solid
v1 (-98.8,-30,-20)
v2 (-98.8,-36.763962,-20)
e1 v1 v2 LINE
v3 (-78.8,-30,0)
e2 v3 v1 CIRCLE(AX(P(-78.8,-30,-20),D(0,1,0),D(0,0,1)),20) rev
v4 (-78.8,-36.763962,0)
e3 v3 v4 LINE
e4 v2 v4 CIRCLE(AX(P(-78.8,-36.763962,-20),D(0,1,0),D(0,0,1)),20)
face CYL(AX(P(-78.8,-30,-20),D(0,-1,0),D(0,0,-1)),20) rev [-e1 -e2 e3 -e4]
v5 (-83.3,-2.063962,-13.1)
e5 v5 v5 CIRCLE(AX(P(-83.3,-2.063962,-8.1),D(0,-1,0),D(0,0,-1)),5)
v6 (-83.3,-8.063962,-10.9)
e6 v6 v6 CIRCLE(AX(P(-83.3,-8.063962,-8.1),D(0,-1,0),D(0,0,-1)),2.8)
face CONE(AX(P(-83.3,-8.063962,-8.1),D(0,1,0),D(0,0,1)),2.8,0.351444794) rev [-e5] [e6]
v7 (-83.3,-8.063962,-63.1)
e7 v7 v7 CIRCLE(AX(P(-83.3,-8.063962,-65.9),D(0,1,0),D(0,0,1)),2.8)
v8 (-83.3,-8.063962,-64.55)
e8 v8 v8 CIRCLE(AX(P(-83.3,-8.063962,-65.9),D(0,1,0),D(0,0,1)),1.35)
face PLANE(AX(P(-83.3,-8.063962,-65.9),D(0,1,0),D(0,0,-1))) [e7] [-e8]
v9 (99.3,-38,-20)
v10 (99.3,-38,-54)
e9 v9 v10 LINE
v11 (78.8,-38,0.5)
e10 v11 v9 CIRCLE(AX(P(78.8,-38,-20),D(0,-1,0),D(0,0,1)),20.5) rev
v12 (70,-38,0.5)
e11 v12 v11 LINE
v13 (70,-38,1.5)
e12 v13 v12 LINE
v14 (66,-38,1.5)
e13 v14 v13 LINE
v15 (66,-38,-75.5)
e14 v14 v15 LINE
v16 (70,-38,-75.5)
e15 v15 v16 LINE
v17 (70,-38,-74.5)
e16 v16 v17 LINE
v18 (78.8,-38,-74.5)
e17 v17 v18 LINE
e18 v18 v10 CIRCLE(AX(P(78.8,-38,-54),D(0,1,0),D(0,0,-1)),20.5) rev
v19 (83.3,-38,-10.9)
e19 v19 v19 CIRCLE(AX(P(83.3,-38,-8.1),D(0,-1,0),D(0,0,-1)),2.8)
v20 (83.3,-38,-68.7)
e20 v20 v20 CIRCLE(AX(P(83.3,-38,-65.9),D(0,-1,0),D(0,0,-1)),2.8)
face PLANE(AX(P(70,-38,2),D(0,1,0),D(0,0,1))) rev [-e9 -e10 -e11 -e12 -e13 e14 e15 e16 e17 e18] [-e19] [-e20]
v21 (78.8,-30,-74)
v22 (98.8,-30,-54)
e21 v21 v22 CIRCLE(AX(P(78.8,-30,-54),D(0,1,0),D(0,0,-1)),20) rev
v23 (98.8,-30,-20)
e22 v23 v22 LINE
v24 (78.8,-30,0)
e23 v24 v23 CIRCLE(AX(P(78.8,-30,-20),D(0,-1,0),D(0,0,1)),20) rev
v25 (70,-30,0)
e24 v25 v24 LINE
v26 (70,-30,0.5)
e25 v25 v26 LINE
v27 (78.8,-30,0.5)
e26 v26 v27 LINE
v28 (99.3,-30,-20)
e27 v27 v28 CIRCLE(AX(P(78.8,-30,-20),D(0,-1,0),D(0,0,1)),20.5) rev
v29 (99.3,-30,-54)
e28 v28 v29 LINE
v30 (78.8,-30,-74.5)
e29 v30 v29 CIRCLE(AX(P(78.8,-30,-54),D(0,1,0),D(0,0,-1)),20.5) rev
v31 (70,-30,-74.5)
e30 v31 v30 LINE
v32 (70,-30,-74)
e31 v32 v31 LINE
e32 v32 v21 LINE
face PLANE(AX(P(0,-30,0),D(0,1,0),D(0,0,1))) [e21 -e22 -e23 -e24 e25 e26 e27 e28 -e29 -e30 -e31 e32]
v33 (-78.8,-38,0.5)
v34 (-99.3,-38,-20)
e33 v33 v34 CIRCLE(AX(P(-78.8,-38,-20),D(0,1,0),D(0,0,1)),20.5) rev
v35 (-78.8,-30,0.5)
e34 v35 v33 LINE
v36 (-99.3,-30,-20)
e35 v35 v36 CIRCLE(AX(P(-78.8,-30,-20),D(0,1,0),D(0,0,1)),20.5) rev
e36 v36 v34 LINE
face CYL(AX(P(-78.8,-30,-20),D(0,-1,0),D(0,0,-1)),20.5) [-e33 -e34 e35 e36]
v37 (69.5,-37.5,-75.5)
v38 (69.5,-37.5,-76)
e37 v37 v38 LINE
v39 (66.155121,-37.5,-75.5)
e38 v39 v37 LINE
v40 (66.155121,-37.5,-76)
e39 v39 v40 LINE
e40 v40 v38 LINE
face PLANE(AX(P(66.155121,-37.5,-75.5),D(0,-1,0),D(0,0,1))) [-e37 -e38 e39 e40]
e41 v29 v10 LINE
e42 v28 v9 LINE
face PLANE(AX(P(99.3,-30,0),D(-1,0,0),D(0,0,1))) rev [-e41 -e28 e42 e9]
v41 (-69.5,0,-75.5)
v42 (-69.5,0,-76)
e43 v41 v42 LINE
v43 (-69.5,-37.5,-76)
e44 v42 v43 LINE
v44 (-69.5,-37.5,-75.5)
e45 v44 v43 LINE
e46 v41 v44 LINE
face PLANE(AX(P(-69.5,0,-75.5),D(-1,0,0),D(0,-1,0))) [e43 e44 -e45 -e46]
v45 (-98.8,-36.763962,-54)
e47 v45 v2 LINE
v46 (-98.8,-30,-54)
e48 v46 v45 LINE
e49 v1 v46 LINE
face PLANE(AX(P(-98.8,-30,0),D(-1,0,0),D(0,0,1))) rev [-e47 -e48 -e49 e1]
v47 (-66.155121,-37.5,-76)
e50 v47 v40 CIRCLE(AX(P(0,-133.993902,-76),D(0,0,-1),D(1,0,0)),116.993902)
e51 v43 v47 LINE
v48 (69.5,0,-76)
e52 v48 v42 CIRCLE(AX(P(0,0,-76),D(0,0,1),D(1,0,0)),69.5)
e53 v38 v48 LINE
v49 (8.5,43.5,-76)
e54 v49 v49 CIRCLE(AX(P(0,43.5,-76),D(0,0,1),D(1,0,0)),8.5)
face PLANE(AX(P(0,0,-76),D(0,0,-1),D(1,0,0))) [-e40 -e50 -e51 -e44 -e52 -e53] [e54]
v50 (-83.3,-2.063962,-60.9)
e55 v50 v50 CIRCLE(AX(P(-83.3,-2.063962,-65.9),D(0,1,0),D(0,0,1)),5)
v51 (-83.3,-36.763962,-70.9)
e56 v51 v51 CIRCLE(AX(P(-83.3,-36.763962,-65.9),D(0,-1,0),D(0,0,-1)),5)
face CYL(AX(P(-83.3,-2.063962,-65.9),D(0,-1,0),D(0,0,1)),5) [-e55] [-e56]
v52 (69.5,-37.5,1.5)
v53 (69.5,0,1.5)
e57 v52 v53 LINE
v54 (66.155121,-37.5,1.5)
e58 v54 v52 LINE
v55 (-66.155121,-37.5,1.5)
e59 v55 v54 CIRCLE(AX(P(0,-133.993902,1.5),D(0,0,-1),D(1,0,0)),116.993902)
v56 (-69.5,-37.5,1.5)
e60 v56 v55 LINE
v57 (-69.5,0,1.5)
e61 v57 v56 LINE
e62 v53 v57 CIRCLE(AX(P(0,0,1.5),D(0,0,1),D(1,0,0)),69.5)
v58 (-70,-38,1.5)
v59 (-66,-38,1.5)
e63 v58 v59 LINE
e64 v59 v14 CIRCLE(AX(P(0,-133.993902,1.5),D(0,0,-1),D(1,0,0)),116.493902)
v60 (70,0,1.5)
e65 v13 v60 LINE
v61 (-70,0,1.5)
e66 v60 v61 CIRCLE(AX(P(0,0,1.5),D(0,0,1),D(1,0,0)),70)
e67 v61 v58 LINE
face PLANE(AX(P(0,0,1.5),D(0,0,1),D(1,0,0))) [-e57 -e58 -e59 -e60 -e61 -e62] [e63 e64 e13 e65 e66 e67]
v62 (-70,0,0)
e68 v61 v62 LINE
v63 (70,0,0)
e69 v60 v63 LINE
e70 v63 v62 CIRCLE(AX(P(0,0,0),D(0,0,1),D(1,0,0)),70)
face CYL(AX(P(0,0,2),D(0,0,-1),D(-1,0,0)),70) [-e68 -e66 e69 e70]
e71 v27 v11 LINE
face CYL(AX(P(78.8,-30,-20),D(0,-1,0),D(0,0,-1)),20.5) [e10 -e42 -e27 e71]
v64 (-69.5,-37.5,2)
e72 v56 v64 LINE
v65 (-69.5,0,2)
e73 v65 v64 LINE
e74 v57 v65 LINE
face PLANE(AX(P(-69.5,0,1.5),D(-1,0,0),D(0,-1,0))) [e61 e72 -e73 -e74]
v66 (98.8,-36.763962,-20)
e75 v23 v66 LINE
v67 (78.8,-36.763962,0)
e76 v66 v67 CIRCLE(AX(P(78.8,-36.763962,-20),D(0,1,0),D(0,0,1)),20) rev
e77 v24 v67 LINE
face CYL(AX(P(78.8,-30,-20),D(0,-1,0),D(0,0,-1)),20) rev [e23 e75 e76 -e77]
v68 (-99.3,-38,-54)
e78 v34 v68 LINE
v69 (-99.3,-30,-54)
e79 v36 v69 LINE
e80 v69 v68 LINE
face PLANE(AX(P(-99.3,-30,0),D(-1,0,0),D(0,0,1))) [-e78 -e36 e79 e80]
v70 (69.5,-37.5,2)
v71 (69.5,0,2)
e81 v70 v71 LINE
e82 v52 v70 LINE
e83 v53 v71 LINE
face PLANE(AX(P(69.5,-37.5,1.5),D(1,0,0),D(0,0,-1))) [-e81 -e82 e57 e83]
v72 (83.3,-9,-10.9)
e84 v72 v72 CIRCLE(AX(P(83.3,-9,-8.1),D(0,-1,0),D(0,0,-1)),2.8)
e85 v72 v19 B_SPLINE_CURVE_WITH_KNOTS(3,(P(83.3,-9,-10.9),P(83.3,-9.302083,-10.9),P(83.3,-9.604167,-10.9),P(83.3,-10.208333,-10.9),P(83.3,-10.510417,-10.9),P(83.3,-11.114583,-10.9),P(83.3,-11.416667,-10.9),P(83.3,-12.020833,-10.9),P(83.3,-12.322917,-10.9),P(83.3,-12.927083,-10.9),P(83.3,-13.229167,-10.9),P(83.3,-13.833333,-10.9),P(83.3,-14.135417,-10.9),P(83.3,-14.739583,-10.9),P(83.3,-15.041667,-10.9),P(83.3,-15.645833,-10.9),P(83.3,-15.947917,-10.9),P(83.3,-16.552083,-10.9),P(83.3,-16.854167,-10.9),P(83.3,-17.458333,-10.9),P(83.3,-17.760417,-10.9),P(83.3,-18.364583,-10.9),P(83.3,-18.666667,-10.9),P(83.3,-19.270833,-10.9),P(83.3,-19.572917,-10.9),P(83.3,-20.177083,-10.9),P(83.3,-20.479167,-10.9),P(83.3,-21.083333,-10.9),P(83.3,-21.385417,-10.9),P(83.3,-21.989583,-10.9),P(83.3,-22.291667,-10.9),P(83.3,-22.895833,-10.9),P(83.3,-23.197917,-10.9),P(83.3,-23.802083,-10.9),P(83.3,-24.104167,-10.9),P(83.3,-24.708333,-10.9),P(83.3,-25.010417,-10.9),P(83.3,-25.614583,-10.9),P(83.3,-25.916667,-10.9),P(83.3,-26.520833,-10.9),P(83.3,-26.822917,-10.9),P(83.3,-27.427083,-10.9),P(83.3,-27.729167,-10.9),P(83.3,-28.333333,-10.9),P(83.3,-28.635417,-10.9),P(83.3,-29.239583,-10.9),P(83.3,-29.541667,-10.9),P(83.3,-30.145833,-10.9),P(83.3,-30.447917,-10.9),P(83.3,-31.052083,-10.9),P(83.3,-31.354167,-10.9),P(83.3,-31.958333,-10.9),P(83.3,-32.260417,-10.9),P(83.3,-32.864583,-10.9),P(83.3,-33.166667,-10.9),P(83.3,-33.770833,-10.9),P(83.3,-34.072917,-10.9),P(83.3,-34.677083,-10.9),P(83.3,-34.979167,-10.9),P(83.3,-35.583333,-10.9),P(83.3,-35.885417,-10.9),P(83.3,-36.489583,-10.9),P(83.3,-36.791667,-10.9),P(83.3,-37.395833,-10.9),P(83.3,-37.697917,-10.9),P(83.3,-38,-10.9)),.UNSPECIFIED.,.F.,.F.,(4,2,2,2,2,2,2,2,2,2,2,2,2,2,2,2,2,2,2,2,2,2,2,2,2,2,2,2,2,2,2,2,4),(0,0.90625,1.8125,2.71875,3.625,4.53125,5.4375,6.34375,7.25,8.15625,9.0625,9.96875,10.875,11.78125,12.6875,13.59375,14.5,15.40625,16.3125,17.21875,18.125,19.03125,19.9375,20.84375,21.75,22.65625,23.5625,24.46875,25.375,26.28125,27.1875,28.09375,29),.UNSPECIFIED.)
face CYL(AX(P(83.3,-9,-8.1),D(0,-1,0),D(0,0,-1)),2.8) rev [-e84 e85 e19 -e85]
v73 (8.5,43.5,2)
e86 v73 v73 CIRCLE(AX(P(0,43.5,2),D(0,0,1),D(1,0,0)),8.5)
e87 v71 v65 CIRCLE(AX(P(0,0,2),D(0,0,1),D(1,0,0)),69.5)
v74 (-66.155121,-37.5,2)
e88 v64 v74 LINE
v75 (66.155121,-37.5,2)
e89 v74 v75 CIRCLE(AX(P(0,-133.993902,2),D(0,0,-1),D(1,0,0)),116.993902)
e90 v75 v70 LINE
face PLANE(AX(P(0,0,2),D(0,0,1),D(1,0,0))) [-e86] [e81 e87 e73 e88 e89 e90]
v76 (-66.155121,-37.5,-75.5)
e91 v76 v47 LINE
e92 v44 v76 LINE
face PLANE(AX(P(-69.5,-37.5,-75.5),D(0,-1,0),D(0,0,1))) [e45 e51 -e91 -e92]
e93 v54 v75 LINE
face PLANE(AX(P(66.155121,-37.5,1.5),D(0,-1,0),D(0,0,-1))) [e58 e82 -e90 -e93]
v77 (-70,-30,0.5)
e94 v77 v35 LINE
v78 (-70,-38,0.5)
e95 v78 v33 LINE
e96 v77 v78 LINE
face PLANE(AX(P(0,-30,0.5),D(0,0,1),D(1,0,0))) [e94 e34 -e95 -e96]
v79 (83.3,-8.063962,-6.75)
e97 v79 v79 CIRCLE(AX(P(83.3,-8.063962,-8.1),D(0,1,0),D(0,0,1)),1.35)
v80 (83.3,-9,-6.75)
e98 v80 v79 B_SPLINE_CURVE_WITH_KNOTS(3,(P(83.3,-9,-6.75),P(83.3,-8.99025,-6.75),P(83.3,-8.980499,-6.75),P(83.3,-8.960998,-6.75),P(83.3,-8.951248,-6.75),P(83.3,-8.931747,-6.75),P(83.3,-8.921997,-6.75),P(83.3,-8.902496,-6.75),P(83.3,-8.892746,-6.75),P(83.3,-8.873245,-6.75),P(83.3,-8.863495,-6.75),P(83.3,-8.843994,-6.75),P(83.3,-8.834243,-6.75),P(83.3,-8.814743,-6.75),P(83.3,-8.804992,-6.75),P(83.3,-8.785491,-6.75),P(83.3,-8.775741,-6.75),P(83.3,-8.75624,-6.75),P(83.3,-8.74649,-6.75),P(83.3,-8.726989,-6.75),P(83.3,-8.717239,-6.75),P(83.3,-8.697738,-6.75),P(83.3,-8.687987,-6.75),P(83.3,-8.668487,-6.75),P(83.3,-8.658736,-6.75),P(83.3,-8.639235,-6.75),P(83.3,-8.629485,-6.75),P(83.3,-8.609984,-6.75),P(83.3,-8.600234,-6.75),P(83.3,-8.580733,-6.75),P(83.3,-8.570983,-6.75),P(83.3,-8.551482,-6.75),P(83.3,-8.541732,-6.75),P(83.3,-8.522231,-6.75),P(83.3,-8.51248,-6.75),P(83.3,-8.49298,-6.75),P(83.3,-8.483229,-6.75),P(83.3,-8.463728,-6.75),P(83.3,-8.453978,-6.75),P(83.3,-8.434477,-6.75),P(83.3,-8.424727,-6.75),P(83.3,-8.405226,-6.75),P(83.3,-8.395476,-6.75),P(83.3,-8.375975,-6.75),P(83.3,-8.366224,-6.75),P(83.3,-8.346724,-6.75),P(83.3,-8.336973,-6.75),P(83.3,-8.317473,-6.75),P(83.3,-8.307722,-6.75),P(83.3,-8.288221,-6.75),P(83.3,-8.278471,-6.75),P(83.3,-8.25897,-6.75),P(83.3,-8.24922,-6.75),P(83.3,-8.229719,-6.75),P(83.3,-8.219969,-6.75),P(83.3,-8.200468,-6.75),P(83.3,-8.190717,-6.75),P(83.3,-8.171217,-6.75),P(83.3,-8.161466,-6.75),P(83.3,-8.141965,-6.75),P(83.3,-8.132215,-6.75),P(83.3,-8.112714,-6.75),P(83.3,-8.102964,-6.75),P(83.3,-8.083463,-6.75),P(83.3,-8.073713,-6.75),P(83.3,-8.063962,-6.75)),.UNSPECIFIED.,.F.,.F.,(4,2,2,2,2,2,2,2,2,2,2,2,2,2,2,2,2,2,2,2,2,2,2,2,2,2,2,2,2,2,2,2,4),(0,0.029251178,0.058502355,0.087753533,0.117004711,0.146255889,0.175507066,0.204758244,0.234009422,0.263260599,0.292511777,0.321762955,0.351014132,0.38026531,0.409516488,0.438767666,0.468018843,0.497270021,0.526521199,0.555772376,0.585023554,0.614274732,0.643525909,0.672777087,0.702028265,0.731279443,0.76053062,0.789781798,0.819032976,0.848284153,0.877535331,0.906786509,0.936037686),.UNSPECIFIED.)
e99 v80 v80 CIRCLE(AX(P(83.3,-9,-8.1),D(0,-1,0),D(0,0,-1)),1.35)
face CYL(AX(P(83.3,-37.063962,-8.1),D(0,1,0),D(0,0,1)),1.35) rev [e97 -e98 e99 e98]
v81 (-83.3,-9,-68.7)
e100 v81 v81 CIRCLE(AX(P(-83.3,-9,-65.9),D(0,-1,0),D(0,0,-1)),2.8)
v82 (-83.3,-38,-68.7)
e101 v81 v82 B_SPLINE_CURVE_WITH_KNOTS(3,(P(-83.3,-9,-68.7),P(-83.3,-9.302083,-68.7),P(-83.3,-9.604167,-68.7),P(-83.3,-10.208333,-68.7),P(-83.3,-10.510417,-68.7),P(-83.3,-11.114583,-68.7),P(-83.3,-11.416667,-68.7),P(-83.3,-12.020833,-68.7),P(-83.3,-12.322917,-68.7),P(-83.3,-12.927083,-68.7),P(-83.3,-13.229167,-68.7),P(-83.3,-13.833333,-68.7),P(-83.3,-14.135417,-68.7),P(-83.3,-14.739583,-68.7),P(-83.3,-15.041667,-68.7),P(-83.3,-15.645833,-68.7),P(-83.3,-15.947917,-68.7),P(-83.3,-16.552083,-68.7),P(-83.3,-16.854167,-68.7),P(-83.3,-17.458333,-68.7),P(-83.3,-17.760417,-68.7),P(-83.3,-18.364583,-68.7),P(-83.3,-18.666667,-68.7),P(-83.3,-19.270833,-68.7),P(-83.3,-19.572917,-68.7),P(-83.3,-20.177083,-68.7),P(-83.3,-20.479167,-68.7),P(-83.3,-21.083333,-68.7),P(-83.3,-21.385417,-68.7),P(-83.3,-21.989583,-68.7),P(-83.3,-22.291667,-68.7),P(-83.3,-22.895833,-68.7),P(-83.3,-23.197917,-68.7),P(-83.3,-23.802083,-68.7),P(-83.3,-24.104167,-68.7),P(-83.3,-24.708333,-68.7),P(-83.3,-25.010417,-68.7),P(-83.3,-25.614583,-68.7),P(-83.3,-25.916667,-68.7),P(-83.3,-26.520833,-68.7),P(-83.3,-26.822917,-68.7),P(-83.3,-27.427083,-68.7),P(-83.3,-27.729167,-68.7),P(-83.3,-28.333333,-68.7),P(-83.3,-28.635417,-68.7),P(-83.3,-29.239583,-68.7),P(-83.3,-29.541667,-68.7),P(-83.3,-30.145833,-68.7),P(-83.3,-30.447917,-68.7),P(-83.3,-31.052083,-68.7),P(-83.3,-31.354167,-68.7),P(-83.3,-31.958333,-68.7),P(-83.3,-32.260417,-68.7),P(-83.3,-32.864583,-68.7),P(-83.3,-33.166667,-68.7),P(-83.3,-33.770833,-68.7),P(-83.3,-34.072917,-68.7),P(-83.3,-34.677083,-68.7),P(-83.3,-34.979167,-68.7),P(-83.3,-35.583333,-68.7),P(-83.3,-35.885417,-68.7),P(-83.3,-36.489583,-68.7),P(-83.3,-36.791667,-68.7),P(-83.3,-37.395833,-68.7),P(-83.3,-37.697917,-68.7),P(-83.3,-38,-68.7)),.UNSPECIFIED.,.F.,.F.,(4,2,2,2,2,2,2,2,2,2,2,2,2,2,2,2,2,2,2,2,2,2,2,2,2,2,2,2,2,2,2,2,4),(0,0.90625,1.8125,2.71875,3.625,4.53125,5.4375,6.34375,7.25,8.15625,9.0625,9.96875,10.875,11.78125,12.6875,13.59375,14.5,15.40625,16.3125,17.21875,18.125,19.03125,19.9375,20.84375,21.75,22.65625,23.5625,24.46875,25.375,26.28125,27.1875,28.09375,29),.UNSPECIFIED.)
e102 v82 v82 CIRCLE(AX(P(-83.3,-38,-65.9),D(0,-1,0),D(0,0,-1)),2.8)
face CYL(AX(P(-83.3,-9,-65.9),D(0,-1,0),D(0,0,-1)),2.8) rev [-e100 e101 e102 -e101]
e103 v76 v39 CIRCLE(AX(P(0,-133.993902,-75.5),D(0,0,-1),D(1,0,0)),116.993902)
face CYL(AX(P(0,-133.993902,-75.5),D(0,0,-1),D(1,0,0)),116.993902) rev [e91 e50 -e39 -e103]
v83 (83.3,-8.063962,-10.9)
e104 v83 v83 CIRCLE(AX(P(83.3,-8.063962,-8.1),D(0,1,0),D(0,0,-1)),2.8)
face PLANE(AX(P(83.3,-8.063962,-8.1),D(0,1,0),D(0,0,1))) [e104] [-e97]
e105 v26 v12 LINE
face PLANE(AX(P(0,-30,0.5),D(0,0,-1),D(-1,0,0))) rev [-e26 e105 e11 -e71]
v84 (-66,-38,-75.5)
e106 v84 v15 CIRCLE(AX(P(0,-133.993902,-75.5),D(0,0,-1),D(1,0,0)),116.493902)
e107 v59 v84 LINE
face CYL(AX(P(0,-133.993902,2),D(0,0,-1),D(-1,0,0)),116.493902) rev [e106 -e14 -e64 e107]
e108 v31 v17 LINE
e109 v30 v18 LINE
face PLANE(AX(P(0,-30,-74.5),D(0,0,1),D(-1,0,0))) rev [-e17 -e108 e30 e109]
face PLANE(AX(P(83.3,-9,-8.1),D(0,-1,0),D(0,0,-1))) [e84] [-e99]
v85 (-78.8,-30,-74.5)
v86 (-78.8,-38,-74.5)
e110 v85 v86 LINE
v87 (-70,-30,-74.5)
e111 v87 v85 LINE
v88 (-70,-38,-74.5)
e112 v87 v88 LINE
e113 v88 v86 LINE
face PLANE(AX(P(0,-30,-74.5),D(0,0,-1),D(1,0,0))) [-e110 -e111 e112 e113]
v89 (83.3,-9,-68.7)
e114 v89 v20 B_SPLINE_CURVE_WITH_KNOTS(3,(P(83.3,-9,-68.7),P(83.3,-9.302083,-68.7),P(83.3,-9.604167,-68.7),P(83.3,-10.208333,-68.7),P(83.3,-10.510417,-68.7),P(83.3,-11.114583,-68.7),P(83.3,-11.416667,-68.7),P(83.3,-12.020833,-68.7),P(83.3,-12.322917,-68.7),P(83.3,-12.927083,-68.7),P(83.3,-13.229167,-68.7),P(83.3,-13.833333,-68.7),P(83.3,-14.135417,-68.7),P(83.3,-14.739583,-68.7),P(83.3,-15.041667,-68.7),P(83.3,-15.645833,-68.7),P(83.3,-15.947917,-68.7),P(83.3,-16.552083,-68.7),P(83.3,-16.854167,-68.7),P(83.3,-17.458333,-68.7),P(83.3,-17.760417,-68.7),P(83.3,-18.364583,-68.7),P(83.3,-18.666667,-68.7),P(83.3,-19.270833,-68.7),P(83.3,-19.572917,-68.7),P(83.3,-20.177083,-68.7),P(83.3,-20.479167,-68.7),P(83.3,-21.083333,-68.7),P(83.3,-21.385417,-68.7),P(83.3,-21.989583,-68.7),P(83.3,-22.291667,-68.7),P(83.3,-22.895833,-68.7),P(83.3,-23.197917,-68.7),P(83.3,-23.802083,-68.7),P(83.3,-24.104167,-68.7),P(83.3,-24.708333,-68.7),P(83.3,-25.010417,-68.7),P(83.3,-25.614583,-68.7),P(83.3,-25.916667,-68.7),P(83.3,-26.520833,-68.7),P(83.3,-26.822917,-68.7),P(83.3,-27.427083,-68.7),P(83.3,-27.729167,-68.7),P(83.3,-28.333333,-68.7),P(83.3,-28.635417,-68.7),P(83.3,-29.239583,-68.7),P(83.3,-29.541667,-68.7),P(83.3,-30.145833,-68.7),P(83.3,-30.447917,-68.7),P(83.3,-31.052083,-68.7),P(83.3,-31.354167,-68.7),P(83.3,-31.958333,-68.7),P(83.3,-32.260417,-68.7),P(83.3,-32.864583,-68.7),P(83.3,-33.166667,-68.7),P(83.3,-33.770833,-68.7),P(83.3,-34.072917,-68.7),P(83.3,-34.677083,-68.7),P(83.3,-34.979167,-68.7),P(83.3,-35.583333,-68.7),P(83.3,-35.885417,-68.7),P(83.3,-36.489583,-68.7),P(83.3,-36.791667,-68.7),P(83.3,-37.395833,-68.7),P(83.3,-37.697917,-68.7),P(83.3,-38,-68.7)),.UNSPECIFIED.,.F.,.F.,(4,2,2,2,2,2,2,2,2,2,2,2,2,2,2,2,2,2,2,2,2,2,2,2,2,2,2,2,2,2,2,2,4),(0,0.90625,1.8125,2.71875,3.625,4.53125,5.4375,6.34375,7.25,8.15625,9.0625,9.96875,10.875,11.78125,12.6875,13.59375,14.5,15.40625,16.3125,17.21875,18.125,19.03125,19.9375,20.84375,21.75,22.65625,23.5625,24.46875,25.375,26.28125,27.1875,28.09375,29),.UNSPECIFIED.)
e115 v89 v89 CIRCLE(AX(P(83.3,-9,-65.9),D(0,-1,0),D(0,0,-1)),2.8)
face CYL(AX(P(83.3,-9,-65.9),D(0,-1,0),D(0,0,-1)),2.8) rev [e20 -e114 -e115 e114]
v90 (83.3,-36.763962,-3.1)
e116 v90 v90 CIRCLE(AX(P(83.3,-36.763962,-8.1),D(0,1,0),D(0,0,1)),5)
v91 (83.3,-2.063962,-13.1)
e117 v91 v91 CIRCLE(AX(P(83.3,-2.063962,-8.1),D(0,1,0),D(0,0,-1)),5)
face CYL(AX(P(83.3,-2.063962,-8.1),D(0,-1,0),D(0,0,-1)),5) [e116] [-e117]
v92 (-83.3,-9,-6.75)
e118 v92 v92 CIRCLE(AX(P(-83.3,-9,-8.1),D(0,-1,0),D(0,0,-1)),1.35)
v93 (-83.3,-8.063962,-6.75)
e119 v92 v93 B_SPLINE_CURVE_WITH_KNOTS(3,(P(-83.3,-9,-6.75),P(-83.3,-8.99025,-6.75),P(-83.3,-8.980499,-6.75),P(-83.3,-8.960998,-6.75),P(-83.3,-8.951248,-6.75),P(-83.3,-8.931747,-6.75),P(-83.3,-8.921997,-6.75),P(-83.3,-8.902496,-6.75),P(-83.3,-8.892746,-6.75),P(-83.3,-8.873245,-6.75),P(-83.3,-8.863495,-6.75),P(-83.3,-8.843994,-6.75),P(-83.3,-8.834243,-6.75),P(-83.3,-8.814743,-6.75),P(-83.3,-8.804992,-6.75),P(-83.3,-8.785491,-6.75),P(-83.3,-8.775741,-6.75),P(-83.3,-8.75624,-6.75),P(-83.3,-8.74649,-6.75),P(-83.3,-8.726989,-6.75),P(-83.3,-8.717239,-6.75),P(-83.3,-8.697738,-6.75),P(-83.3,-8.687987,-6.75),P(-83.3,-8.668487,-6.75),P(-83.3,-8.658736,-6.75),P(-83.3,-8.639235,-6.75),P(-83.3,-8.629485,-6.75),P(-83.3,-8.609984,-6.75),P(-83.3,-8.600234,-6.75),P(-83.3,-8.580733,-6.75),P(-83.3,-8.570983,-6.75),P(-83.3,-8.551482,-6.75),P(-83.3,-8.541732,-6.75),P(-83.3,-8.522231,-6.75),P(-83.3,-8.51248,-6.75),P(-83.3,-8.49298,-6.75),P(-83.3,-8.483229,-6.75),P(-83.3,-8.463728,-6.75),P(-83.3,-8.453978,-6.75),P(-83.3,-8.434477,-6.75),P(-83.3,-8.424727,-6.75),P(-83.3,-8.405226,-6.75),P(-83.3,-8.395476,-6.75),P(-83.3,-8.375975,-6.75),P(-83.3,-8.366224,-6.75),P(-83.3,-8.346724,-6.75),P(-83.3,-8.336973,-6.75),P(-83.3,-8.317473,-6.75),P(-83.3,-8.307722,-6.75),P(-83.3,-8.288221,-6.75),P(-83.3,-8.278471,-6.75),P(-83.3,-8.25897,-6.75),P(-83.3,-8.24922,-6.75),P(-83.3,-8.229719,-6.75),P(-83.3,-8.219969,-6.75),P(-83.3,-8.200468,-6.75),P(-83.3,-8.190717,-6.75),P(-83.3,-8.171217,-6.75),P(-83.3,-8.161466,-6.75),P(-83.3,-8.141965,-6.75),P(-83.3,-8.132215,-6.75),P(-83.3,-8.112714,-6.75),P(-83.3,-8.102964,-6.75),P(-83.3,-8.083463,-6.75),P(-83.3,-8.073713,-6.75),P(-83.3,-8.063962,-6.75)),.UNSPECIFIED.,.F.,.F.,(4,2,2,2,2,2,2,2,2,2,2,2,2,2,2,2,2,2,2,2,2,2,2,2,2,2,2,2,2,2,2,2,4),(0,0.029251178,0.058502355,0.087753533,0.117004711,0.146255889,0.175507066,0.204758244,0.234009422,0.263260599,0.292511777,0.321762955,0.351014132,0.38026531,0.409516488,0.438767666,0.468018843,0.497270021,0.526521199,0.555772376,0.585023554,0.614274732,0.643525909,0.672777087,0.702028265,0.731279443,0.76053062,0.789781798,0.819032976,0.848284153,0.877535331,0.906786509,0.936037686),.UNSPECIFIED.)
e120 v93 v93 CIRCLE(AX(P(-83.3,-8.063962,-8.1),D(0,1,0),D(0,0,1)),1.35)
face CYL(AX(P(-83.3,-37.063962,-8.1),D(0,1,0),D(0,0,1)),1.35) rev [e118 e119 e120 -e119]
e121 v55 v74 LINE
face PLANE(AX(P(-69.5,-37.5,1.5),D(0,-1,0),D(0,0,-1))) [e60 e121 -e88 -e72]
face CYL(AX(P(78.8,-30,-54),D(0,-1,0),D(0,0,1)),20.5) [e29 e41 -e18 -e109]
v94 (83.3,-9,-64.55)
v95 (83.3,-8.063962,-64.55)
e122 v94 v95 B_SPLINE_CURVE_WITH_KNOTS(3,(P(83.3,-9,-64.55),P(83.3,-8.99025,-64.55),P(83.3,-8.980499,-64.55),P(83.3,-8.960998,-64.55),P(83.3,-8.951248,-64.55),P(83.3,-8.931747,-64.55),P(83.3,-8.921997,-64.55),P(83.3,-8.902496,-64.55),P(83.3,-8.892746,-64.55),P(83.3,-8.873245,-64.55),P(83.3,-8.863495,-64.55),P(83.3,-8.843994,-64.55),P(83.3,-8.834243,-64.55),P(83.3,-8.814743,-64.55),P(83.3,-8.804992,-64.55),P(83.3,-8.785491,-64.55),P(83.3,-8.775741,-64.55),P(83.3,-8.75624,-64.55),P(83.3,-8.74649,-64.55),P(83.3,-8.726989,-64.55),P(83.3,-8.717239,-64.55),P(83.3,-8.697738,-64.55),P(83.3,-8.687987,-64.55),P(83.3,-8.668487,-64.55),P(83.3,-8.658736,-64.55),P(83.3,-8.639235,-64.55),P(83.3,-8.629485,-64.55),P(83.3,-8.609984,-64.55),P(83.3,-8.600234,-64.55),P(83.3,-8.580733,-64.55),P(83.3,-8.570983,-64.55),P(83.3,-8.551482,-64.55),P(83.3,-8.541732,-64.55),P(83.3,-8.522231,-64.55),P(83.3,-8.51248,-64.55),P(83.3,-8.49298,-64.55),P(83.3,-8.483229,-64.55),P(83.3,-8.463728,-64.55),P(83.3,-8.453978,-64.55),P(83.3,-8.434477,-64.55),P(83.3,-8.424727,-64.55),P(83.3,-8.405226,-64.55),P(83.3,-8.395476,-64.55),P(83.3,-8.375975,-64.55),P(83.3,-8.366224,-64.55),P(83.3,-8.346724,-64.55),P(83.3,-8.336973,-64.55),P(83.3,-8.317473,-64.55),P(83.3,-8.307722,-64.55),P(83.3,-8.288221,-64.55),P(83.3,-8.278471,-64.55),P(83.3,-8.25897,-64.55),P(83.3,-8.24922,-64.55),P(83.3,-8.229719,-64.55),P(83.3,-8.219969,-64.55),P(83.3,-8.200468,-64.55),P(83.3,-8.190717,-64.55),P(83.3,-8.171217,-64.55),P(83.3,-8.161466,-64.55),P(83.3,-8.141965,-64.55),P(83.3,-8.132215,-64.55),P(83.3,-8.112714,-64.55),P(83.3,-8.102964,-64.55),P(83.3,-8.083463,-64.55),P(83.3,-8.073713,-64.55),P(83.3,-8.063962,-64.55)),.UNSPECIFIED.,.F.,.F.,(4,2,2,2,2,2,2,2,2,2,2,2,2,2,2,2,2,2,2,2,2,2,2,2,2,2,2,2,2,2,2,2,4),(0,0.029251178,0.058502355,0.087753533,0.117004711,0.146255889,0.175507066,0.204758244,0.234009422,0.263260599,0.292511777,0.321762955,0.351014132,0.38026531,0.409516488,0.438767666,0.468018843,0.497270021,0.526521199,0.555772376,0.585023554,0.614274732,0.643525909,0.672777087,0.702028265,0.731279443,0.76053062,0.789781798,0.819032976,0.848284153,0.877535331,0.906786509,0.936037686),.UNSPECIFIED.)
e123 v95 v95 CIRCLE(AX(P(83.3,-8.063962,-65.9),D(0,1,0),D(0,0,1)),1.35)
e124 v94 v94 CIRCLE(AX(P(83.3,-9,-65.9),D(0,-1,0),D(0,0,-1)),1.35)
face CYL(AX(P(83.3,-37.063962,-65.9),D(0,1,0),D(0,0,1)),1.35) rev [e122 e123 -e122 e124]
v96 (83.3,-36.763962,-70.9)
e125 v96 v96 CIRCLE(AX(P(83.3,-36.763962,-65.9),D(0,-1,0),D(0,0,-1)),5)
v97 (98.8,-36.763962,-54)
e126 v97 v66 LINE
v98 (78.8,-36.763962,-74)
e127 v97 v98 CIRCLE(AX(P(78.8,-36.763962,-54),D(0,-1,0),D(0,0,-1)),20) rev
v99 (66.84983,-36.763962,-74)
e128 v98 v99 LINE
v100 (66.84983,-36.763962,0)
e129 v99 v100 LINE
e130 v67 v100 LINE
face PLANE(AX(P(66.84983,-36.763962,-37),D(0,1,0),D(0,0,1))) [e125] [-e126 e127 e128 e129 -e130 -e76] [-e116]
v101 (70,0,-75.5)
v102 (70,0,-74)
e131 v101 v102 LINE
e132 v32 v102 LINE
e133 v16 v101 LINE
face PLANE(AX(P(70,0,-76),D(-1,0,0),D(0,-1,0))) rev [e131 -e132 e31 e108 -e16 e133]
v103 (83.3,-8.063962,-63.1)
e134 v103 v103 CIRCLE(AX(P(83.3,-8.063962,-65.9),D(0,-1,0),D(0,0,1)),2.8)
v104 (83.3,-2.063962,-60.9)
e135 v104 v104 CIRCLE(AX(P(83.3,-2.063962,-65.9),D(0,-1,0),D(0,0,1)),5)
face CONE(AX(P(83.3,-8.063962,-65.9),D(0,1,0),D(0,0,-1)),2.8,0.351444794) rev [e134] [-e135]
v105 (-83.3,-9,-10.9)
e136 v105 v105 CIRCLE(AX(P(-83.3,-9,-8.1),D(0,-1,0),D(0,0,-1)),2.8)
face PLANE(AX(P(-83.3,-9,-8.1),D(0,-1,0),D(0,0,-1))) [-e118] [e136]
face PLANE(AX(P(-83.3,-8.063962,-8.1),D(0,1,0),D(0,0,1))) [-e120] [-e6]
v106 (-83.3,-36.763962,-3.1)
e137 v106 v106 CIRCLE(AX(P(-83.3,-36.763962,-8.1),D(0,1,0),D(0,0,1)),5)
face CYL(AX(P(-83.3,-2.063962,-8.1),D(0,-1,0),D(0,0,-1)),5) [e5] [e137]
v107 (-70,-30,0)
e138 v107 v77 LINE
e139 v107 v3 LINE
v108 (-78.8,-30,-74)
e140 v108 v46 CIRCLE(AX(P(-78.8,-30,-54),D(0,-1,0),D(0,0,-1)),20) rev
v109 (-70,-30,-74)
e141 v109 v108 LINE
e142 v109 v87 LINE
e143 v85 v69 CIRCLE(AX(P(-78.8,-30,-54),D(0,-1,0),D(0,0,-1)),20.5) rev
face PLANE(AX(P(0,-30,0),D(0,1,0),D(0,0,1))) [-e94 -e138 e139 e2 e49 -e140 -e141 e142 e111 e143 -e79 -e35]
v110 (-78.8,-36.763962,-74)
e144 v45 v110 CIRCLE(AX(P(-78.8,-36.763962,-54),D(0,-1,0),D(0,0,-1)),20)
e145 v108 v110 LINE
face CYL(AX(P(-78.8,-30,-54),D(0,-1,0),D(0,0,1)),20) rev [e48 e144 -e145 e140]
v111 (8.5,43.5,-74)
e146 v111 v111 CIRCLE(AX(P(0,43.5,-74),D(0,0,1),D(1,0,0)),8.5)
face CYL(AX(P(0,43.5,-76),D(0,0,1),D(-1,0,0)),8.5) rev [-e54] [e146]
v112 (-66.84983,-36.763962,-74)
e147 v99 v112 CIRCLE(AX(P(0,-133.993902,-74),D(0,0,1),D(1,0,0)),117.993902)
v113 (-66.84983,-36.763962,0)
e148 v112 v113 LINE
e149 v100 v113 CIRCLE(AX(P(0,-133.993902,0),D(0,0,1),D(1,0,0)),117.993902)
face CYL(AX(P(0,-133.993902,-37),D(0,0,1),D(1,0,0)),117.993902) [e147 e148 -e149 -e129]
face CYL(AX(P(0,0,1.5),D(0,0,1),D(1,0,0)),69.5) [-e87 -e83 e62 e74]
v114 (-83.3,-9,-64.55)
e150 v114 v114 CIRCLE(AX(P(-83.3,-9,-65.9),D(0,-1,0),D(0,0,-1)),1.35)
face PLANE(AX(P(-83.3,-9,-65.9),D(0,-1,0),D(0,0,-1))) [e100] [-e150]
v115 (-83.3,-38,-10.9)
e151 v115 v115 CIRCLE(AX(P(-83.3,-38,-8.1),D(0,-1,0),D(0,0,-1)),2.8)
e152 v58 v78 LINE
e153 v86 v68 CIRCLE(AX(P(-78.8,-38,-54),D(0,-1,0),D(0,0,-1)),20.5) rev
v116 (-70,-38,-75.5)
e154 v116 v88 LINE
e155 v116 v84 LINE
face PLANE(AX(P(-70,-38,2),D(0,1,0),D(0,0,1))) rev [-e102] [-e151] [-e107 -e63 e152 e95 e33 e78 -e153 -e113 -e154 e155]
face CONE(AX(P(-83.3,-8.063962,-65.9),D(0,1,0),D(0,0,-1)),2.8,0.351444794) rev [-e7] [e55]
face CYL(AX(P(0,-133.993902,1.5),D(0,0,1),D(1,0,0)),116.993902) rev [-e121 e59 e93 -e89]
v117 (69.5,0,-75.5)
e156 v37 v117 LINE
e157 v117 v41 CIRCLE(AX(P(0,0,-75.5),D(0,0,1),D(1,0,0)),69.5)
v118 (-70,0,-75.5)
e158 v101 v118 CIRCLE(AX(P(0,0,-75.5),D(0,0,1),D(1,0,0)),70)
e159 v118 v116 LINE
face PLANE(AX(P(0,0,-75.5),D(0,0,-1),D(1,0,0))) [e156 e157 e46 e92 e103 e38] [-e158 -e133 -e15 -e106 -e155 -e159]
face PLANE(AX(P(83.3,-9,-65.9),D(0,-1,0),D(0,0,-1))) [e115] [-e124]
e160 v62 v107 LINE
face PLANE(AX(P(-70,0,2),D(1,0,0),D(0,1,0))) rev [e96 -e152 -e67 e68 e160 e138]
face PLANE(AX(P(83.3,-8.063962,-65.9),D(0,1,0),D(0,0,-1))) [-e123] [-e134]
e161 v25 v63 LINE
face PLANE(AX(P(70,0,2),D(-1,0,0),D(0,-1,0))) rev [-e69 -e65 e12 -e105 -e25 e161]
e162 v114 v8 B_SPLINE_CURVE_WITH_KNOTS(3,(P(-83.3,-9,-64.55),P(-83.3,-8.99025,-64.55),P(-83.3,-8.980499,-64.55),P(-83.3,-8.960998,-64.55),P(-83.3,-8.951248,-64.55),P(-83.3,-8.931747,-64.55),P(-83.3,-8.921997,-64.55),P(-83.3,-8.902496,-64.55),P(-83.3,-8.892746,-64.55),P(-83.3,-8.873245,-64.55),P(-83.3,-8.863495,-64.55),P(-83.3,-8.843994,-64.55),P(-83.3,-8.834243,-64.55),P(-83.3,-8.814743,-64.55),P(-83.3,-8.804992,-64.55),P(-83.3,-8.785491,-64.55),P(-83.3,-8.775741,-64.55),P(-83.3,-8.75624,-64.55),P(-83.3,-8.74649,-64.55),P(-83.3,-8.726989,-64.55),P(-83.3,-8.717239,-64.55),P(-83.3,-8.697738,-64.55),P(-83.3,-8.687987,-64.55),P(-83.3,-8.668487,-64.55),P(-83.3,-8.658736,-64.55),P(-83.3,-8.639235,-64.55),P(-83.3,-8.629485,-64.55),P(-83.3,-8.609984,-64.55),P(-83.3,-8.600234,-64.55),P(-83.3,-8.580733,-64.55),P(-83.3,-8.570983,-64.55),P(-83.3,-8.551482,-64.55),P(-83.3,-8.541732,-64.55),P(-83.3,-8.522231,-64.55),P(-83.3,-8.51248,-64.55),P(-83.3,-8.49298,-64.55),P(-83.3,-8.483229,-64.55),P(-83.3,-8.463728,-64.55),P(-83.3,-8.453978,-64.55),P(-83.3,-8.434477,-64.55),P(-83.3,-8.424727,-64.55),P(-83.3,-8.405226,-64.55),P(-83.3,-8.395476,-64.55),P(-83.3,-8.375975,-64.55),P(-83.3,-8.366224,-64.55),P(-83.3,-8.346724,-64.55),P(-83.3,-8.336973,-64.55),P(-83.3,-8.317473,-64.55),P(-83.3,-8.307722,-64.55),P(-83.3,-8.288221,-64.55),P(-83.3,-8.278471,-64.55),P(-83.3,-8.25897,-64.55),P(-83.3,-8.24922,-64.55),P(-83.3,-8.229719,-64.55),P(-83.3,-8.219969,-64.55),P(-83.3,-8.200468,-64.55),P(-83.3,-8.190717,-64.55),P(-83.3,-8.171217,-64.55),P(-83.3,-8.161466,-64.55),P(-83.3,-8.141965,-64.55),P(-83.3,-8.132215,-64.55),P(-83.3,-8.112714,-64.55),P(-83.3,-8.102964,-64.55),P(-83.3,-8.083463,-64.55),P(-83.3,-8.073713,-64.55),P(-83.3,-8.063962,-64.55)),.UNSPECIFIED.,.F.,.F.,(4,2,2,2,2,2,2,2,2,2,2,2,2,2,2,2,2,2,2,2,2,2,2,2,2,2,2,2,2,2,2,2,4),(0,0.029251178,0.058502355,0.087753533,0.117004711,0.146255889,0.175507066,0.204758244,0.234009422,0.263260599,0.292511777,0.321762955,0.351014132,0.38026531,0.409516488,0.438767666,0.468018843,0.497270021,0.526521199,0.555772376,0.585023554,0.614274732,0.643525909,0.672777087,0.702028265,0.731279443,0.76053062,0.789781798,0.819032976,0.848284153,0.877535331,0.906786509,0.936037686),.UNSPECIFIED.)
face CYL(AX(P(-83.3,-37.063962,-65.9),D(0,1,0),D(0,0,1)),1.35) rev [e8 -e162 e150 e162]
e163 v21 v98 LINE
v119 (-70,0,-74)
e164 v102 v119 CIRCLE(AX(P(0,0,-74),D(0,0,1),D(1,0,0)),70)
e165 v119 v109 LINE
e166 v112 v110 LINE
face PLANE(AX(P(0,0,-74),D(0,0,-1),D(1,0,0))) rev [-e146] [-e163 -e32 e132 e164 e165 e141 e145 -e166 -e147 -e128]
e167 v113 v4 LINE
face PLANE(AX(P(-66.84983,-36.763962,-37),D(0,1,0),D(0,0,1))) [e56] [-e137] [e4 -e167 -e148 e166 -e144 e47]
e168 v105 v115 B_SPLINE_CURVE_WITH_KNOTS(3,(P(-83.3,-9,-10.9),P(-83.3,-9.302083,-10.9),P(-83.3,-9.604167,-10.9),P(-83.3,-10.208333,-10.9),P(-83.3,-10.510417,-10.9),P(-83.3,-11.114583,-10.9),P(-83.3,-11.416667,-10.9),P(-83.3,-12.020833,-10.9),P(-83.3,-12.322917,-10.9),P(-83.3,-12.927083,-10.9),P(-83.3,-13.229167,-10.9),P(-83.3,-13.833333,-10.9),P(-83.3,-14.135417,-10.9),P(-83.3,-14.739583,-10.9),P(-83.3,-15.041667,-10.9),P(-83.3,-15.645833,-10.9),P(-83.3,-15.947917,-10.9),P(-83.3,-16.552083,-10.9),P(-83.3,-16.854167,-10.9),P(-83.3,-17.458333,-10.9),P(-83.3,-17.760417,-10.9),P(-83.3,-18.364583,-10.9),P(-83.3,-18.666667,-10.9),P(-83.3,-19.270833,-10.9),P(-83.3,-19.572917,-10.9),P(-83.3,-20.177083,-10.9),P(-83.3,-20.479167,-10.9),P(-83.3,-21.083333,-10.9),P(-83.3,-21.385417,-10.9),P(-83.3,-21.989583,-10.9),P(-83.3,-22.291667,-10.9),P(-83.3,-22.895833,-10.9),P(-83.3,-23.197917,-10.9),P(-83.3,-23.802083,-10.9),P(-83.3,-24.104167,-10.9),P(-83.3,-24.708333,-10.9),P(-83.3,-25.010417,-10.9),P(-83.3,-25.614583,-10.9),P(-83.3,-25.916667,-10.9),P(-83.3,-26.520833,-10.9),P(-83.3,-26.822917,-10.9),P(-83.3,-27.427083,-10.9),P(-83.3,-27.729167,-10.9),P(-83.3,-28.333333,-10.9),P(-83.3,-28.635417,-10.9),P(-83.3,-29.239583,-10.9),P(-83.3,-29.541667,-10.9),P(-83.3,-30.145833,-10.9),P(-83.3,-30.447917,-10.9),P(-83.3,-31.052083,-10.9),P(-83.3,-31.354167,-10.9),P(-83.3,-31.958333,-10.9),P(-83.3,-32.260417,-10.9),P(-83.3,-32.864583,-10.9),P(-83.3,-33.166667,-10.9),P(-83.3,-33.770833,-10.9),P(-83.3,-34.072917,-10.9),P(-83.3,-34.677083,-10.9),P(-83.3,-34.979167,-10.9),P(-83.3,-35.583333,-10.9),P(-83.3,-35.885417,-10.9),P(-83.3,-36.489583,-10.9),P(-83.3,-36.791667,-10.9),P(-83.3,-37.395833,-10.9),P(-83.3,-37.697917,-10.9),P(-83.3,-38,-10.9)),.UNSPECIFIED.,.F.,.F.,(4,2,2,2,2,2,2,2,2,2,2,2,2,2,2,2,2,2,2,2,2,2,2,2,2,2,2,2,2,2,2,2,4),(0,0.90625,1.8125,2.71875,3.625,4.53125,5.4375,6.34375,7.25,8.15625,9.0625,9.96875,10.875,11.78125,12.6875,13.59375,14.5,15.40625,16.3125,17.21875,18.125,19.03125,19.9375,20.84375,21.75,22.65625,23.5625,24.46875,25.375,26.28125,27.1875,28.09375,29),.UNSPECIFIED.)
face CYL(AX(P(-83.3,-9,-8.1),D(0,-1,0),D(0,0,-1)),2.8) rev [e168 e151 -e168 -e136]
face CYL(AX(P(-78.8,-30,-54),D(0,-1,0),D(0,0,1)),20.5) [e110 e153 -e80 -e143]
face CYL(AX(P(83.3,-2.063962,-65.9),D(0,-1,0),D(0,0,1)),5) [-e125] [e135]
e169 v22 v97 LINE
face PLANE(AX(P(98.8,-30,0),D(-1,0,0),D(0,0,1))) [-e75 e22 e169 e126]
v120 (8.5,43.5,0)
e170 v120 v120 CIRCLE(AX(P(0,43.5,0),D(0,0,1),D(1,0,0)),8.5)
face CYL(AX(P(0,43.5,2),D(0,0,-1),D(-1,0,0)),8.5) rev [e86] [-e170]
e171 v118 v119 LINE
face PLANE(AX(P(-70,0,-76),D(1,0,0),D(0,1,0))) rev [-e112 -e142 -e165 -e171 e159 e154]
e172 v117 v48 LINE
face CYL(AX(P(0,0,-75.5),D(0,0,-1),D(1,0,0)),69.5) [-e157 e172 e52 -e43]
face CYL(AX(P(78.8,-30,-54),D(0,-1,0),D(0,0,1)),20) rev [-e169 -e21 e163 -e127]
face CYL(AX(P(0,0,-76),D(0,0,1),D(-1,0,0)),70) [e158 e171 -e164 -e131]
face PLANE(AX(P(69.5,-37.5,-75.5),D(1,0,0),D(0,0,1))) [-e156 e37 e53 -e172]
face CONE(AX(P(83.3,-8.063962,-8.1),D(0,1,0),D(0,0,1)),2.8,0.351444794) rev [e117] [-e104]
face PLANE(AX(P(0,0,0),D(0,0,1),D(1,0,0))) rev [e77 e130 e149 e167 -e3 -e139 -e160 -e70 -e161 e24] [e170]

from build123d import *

# Parameters (mm, degrees)
SKETCH1_R           = 8.5
BOSS_EXTRUDE1_DEPTH = 2
CUT_EXTRUDE1_START  = -0.5
CUT_EXTRUDE1_DEPTH  = 0.5
BOSS_EXTRUDE2_START = -37
BOSS_EXTRUDE2_DEPTH = 37
BOSS_EXTRUDE4_DEPTH = 8
BOSS_EXTRUDE5_DEPTH = 1.236037686
SKETCH11_R          = 5
BOSS_EXTRUDE6_DEPTH = 34.7
SKETCH12_R          = 2.8
CUT_EXTRUDE2_DEPTH  = 6
DRAFT1_ANGLE        = -1
SKETCH16_R          = 2.8
CUT_EXTRUDE3_DEPTH  = 29
SKETCH17_R          = 1.35
CUT_EXTRUDE4_DEPTH  = 29


# Read off the part's stored shape, not the designer's step: Mirror5
with BuildPart() as part:
    # Sketch1 → Boss-Extrude1 (new body)
    with BuildSketch(Plane.XY):
        with BuildLine():
            Line((-70, 0), (-70, -38))
            Line((-70, -38), (-66, -38))
            ThreePointArc((-66, -38), (0, -17.5), (66, -38))
            Line((66, -38), (70, -38))
            Line((70, -38), (70, 0))
            ThreePointArc((70, 0), (0, 70), (-70, 0))
        make_face()
        with Locations((0, 43.5)):
            Circle(SKETCH1_R, mode=Mode.SUBTRACT)
    extrude(amount=BOSS_EXTRUDE1_DEPTH)

    # Sketch2 → Cut-Extrude1 (cut)
    with BuildSketch(Plane.XY.offset(2).offset(CUT_EXTRUDE1_START)):
        with BuildLine():
            Line((-70, 0), (-70, -38))
            Line((-70, -38), (-66, -38))
            ThreePointArc((-66, -38), (0, -17.5), (66, -38))
            Line((66, -38), (70, -38))
            Line((70, -38), (70, 0))
            ThreePointArc((70, 0), (0, 70), (-70, 0))
        make_face()
        with BuildLine():
            Line((-69.5, 0), (-69.5, -37.5))
            Line((-69.5, -37.5), (-66.155120739, -37.5))
            ThreePointArc((-66.155120739, -37.5), (0, -17), (66.155120739, -37.5))
            Line((66.155120739, -37.5), (69.5, -37.5))
            Line((69.5, -37.5), (69.5, 0))
            ThreePointArc((69.5, 0), (0, 69.5), (-69.5, 0))
        make_face(mode=Mode.SUBTRACT)
    extrude(amount=CUT_EXTRUDE1_DEPTH, mode=Mode.SUBTRACT)

    # Sketch5 → Boss-Extrude2 (add)
    with BuildSketch(Plane.XY.offset(BOSS_EXTRUDE2_START)):
        with BuildLine():
            Line((66.849829887, -36.763962314), (70, -36.763962314))
            Line((70, -36.763962314), (70, -38))
            Line((70, -38), (66, -38))
            ThreePointArc((66, -38), (0, -17.5), (-66, -38))
            Line((-66, -38), (-70, -38))
            Line((-70, -38), (-70, -36.763962314))
            Line((-70, -36.763962314), (-66.849829887, -36.763962314))
            ThreePointArc((-66.849829887, -36.763962314), (0, -16), (66.849829887, -36.763962314))
        make_face()
    boss_extrude2 = extrude(amount=BOSS_EXTRUDE2_DEPTH)

    # Sketch9 → Boss-Extrude4 (add)
    with BuildSketch(Plane(origin=(0, -38, 0), x_dir=(1, 0, 0), z_dir=(0, 1, 0))):
        with BuildLine():
            ThreePointArc((-78.8, -0.5), (-93.295689014, 5.504310986), (-99.3, 20))
            Line((-99.3, 20), (-99.3, 37))
            Line((-99.3, 37), (-98.8, 37))
            Line((-98.8, 37), (-98.8, 20))
            ThreePointArc((-98.8, 20), (-92.942135624, 5.857864376), (-78.8, 0))
            Line((-78.8, 0), (-70, 0))
            Line((-70, 0), (-70, -0.5))
            Line((-70, -0.5), (-78.8, -0.5))
        make_face()
    boss_extrude4 = extrude(amount=BOSS_EXTRUDE4_DEPTH)

    # Sketch10 → Boss-Extrude5 (add)
    with BuildSketch(Plane(origin=(0, -38, 0), x_dir=(1, 0, 0), z_dir=(0, 1, 0))):
        with BuildLine():
            Line((-70, 0), (-78.8, 0))
            ThreePointArc((-78.8, 0), (-92.942135624, 5.857864376), (-98.8, 20))
            Line((-98.8, 20), (-98.8, 37))
            Line((-98.8, 37), (-70, 37))
            Line((-70, 37), (-70, 0))
        make_face()
    boss_extrude5 = extrude(amount=BOSS_EXTRUDE5_DEPTH)

    # Sketch11 → Boss-Extrude6 (add)
    with BuildSketch(Plane(origin=(0, -36.763962314, 0), x_dir=(1, 0, 0), z_dir=(0, 1, 0))):
        with Locations(Location((-83.3, 8.1, 0), (0, 0, 270))):
            Circle(SKETCH11_R)
    boss_extrude6 = extrude(amount=BOSS_EXTRUDE6_DEPTH)

    # Sketch12 → Cut-Extrude2 (cut)
    with BuildSketch(Plane(origin=(0, -2.063962314, 0), x_dir=(1, 0, 0), z_dir=(0, 1, 0))):
        with Locations(Location((-83.3, 8.1, 0), (0, 0, 270))):
            Circle(SKETCH12_R)
    cut_extrude2 = extrude(amount=-CUT_EXTRUDE2_DEPTH, mode=Mode.SUBTRACT)

    # Draft1
    draft1_faces = [part.faces().sort_by_distance(p)[0] for p in [
        (-83.3, -5.063962314, -10.9),
    ]]
    draft(draft1_faces, Plane(origin=(-83.3, -8.063962314, -8.1), x_dir=(0, 0, 1), z_dir=(0, 1, 0)), DRAFT1_ANGLE)

    # Sketch14 → Cut-Revolve2 (revolve, cut)
    with BuildSketch(Plane.XY.offset(-8.1), mode=Mode.PRIVATE) as cut_revolve2_sk:
        Polygon((-85.99526961, -2.063962314), (-86.1, -8.063962314), (-88.3, -2.063962314), align=None)
    cut_revolve2 = revolve(cut_revolve2_sk.sketch.rotate(Axis((-83.3, -8.063962314, -8.1), (0, 1, 0)), 270), axis=Axis((-83.3, -8.063962314, -8.1), (0, 1, 0)), mode=Mode.SUBTRACT)

    # Mirror3: Boss-Extrude2, Boss-Extrude4, Boss-Extrude5, Boss-Extrude6, Cut-Extrude2, Cut-Revolve2 across plane
    add(boss_extrude2.mirror(Plane(origin=(0, 0, 0), x_dir=(0, 0, 1), z_dir=(1, 0, 0))))
    add(boss_extrude4.mirror(Plane(origin=(0, 0, 0), x_dir=(0, 0, 1), z_dir=(1, 0, 0))))
    add(boss_extrude5.mirror(Plane(origin=(0, 0, 0), x_dir=(0, 0, 1), z_dir=(1, 0, 0))))
    add(boss_extrude6.mirror(Plane(origin=(0, 0, 0), x_dir=(0, 0, 1), z_dir=(1, 0, 0))))
    add(cut_extrude2.mirror(Plane(origin=(0, 0, 0), x_dir=(0, 0, 1), z_dir=(1, 0, 0))), mode=Mode.SUBTRACT)
    add(cut_revolve2.mirror(Plane(origin=(0, 0, 0), x_dir=(0, 0, 1), z_dir=(1, 0, 0))), mode=Mode.SUBTRACT)

    # Mirror5: part across plane


with BuildPart() as part_1:
    add(part.part)
    add(part.part.mirror(Plane(origin=(0, -133.993902439, -37), x_dir=(1, 0, 0), z_dir=(0, 0, 1))))

    # Sketch16 → Cut-Extrude3 (cut)
    with BuildSketch(Plane.XZ.offset(38)):
        with Locations(Location((-83.3, -65.9, 0), (0, 0, 270))):
            Circle(SKETCH16_R)
        with Locations(Location((83.3, -65.9, 0), (0, 0, 270))):
            Circle(SKETCH16_R)
        with Locations(Location((83.3, -8.1, 0), (0, 0, 270))):
            Circle(SKETCH16_R)
        with Locations(Location((-83.3, -8.1, 0), (0, 0, 270))):
            Circle(SKETCH16_R)
    extrude(amount=-CUT_EXTRUDE3_DEPTH, mode=Mode.SUBTRACT)

    # Sketch17 → Cut-Extrude4 (cut)
    with BuildSketch(Plane(origin=(0, -8.063962314, 0), x_dir=(1, 0, 0), z_dir=(0, 1, 0))):
        with Locations(Location((-83.3, 65.9, 0), (0, 0, 270))):
            Circle(SKETCH17_R)
        with Locations(Location((-83.3, 8.1, 0), (0, 0, 270))):
            Circle(SKETCH17_R)
        with Locations(Location((83.3, 65.9, 0), (0, 0, 270))):
            Circle(SKETCH17_R)
        with Locations(Location((83.3, 8.1, 0), (0, 0, 270))):
            Circle(SKETCH17_R)
    extrude(amount=-CUT_EXTRUDE4_DEPTH, mode=Mode.SUBTRACT)


solid = part_1.part
